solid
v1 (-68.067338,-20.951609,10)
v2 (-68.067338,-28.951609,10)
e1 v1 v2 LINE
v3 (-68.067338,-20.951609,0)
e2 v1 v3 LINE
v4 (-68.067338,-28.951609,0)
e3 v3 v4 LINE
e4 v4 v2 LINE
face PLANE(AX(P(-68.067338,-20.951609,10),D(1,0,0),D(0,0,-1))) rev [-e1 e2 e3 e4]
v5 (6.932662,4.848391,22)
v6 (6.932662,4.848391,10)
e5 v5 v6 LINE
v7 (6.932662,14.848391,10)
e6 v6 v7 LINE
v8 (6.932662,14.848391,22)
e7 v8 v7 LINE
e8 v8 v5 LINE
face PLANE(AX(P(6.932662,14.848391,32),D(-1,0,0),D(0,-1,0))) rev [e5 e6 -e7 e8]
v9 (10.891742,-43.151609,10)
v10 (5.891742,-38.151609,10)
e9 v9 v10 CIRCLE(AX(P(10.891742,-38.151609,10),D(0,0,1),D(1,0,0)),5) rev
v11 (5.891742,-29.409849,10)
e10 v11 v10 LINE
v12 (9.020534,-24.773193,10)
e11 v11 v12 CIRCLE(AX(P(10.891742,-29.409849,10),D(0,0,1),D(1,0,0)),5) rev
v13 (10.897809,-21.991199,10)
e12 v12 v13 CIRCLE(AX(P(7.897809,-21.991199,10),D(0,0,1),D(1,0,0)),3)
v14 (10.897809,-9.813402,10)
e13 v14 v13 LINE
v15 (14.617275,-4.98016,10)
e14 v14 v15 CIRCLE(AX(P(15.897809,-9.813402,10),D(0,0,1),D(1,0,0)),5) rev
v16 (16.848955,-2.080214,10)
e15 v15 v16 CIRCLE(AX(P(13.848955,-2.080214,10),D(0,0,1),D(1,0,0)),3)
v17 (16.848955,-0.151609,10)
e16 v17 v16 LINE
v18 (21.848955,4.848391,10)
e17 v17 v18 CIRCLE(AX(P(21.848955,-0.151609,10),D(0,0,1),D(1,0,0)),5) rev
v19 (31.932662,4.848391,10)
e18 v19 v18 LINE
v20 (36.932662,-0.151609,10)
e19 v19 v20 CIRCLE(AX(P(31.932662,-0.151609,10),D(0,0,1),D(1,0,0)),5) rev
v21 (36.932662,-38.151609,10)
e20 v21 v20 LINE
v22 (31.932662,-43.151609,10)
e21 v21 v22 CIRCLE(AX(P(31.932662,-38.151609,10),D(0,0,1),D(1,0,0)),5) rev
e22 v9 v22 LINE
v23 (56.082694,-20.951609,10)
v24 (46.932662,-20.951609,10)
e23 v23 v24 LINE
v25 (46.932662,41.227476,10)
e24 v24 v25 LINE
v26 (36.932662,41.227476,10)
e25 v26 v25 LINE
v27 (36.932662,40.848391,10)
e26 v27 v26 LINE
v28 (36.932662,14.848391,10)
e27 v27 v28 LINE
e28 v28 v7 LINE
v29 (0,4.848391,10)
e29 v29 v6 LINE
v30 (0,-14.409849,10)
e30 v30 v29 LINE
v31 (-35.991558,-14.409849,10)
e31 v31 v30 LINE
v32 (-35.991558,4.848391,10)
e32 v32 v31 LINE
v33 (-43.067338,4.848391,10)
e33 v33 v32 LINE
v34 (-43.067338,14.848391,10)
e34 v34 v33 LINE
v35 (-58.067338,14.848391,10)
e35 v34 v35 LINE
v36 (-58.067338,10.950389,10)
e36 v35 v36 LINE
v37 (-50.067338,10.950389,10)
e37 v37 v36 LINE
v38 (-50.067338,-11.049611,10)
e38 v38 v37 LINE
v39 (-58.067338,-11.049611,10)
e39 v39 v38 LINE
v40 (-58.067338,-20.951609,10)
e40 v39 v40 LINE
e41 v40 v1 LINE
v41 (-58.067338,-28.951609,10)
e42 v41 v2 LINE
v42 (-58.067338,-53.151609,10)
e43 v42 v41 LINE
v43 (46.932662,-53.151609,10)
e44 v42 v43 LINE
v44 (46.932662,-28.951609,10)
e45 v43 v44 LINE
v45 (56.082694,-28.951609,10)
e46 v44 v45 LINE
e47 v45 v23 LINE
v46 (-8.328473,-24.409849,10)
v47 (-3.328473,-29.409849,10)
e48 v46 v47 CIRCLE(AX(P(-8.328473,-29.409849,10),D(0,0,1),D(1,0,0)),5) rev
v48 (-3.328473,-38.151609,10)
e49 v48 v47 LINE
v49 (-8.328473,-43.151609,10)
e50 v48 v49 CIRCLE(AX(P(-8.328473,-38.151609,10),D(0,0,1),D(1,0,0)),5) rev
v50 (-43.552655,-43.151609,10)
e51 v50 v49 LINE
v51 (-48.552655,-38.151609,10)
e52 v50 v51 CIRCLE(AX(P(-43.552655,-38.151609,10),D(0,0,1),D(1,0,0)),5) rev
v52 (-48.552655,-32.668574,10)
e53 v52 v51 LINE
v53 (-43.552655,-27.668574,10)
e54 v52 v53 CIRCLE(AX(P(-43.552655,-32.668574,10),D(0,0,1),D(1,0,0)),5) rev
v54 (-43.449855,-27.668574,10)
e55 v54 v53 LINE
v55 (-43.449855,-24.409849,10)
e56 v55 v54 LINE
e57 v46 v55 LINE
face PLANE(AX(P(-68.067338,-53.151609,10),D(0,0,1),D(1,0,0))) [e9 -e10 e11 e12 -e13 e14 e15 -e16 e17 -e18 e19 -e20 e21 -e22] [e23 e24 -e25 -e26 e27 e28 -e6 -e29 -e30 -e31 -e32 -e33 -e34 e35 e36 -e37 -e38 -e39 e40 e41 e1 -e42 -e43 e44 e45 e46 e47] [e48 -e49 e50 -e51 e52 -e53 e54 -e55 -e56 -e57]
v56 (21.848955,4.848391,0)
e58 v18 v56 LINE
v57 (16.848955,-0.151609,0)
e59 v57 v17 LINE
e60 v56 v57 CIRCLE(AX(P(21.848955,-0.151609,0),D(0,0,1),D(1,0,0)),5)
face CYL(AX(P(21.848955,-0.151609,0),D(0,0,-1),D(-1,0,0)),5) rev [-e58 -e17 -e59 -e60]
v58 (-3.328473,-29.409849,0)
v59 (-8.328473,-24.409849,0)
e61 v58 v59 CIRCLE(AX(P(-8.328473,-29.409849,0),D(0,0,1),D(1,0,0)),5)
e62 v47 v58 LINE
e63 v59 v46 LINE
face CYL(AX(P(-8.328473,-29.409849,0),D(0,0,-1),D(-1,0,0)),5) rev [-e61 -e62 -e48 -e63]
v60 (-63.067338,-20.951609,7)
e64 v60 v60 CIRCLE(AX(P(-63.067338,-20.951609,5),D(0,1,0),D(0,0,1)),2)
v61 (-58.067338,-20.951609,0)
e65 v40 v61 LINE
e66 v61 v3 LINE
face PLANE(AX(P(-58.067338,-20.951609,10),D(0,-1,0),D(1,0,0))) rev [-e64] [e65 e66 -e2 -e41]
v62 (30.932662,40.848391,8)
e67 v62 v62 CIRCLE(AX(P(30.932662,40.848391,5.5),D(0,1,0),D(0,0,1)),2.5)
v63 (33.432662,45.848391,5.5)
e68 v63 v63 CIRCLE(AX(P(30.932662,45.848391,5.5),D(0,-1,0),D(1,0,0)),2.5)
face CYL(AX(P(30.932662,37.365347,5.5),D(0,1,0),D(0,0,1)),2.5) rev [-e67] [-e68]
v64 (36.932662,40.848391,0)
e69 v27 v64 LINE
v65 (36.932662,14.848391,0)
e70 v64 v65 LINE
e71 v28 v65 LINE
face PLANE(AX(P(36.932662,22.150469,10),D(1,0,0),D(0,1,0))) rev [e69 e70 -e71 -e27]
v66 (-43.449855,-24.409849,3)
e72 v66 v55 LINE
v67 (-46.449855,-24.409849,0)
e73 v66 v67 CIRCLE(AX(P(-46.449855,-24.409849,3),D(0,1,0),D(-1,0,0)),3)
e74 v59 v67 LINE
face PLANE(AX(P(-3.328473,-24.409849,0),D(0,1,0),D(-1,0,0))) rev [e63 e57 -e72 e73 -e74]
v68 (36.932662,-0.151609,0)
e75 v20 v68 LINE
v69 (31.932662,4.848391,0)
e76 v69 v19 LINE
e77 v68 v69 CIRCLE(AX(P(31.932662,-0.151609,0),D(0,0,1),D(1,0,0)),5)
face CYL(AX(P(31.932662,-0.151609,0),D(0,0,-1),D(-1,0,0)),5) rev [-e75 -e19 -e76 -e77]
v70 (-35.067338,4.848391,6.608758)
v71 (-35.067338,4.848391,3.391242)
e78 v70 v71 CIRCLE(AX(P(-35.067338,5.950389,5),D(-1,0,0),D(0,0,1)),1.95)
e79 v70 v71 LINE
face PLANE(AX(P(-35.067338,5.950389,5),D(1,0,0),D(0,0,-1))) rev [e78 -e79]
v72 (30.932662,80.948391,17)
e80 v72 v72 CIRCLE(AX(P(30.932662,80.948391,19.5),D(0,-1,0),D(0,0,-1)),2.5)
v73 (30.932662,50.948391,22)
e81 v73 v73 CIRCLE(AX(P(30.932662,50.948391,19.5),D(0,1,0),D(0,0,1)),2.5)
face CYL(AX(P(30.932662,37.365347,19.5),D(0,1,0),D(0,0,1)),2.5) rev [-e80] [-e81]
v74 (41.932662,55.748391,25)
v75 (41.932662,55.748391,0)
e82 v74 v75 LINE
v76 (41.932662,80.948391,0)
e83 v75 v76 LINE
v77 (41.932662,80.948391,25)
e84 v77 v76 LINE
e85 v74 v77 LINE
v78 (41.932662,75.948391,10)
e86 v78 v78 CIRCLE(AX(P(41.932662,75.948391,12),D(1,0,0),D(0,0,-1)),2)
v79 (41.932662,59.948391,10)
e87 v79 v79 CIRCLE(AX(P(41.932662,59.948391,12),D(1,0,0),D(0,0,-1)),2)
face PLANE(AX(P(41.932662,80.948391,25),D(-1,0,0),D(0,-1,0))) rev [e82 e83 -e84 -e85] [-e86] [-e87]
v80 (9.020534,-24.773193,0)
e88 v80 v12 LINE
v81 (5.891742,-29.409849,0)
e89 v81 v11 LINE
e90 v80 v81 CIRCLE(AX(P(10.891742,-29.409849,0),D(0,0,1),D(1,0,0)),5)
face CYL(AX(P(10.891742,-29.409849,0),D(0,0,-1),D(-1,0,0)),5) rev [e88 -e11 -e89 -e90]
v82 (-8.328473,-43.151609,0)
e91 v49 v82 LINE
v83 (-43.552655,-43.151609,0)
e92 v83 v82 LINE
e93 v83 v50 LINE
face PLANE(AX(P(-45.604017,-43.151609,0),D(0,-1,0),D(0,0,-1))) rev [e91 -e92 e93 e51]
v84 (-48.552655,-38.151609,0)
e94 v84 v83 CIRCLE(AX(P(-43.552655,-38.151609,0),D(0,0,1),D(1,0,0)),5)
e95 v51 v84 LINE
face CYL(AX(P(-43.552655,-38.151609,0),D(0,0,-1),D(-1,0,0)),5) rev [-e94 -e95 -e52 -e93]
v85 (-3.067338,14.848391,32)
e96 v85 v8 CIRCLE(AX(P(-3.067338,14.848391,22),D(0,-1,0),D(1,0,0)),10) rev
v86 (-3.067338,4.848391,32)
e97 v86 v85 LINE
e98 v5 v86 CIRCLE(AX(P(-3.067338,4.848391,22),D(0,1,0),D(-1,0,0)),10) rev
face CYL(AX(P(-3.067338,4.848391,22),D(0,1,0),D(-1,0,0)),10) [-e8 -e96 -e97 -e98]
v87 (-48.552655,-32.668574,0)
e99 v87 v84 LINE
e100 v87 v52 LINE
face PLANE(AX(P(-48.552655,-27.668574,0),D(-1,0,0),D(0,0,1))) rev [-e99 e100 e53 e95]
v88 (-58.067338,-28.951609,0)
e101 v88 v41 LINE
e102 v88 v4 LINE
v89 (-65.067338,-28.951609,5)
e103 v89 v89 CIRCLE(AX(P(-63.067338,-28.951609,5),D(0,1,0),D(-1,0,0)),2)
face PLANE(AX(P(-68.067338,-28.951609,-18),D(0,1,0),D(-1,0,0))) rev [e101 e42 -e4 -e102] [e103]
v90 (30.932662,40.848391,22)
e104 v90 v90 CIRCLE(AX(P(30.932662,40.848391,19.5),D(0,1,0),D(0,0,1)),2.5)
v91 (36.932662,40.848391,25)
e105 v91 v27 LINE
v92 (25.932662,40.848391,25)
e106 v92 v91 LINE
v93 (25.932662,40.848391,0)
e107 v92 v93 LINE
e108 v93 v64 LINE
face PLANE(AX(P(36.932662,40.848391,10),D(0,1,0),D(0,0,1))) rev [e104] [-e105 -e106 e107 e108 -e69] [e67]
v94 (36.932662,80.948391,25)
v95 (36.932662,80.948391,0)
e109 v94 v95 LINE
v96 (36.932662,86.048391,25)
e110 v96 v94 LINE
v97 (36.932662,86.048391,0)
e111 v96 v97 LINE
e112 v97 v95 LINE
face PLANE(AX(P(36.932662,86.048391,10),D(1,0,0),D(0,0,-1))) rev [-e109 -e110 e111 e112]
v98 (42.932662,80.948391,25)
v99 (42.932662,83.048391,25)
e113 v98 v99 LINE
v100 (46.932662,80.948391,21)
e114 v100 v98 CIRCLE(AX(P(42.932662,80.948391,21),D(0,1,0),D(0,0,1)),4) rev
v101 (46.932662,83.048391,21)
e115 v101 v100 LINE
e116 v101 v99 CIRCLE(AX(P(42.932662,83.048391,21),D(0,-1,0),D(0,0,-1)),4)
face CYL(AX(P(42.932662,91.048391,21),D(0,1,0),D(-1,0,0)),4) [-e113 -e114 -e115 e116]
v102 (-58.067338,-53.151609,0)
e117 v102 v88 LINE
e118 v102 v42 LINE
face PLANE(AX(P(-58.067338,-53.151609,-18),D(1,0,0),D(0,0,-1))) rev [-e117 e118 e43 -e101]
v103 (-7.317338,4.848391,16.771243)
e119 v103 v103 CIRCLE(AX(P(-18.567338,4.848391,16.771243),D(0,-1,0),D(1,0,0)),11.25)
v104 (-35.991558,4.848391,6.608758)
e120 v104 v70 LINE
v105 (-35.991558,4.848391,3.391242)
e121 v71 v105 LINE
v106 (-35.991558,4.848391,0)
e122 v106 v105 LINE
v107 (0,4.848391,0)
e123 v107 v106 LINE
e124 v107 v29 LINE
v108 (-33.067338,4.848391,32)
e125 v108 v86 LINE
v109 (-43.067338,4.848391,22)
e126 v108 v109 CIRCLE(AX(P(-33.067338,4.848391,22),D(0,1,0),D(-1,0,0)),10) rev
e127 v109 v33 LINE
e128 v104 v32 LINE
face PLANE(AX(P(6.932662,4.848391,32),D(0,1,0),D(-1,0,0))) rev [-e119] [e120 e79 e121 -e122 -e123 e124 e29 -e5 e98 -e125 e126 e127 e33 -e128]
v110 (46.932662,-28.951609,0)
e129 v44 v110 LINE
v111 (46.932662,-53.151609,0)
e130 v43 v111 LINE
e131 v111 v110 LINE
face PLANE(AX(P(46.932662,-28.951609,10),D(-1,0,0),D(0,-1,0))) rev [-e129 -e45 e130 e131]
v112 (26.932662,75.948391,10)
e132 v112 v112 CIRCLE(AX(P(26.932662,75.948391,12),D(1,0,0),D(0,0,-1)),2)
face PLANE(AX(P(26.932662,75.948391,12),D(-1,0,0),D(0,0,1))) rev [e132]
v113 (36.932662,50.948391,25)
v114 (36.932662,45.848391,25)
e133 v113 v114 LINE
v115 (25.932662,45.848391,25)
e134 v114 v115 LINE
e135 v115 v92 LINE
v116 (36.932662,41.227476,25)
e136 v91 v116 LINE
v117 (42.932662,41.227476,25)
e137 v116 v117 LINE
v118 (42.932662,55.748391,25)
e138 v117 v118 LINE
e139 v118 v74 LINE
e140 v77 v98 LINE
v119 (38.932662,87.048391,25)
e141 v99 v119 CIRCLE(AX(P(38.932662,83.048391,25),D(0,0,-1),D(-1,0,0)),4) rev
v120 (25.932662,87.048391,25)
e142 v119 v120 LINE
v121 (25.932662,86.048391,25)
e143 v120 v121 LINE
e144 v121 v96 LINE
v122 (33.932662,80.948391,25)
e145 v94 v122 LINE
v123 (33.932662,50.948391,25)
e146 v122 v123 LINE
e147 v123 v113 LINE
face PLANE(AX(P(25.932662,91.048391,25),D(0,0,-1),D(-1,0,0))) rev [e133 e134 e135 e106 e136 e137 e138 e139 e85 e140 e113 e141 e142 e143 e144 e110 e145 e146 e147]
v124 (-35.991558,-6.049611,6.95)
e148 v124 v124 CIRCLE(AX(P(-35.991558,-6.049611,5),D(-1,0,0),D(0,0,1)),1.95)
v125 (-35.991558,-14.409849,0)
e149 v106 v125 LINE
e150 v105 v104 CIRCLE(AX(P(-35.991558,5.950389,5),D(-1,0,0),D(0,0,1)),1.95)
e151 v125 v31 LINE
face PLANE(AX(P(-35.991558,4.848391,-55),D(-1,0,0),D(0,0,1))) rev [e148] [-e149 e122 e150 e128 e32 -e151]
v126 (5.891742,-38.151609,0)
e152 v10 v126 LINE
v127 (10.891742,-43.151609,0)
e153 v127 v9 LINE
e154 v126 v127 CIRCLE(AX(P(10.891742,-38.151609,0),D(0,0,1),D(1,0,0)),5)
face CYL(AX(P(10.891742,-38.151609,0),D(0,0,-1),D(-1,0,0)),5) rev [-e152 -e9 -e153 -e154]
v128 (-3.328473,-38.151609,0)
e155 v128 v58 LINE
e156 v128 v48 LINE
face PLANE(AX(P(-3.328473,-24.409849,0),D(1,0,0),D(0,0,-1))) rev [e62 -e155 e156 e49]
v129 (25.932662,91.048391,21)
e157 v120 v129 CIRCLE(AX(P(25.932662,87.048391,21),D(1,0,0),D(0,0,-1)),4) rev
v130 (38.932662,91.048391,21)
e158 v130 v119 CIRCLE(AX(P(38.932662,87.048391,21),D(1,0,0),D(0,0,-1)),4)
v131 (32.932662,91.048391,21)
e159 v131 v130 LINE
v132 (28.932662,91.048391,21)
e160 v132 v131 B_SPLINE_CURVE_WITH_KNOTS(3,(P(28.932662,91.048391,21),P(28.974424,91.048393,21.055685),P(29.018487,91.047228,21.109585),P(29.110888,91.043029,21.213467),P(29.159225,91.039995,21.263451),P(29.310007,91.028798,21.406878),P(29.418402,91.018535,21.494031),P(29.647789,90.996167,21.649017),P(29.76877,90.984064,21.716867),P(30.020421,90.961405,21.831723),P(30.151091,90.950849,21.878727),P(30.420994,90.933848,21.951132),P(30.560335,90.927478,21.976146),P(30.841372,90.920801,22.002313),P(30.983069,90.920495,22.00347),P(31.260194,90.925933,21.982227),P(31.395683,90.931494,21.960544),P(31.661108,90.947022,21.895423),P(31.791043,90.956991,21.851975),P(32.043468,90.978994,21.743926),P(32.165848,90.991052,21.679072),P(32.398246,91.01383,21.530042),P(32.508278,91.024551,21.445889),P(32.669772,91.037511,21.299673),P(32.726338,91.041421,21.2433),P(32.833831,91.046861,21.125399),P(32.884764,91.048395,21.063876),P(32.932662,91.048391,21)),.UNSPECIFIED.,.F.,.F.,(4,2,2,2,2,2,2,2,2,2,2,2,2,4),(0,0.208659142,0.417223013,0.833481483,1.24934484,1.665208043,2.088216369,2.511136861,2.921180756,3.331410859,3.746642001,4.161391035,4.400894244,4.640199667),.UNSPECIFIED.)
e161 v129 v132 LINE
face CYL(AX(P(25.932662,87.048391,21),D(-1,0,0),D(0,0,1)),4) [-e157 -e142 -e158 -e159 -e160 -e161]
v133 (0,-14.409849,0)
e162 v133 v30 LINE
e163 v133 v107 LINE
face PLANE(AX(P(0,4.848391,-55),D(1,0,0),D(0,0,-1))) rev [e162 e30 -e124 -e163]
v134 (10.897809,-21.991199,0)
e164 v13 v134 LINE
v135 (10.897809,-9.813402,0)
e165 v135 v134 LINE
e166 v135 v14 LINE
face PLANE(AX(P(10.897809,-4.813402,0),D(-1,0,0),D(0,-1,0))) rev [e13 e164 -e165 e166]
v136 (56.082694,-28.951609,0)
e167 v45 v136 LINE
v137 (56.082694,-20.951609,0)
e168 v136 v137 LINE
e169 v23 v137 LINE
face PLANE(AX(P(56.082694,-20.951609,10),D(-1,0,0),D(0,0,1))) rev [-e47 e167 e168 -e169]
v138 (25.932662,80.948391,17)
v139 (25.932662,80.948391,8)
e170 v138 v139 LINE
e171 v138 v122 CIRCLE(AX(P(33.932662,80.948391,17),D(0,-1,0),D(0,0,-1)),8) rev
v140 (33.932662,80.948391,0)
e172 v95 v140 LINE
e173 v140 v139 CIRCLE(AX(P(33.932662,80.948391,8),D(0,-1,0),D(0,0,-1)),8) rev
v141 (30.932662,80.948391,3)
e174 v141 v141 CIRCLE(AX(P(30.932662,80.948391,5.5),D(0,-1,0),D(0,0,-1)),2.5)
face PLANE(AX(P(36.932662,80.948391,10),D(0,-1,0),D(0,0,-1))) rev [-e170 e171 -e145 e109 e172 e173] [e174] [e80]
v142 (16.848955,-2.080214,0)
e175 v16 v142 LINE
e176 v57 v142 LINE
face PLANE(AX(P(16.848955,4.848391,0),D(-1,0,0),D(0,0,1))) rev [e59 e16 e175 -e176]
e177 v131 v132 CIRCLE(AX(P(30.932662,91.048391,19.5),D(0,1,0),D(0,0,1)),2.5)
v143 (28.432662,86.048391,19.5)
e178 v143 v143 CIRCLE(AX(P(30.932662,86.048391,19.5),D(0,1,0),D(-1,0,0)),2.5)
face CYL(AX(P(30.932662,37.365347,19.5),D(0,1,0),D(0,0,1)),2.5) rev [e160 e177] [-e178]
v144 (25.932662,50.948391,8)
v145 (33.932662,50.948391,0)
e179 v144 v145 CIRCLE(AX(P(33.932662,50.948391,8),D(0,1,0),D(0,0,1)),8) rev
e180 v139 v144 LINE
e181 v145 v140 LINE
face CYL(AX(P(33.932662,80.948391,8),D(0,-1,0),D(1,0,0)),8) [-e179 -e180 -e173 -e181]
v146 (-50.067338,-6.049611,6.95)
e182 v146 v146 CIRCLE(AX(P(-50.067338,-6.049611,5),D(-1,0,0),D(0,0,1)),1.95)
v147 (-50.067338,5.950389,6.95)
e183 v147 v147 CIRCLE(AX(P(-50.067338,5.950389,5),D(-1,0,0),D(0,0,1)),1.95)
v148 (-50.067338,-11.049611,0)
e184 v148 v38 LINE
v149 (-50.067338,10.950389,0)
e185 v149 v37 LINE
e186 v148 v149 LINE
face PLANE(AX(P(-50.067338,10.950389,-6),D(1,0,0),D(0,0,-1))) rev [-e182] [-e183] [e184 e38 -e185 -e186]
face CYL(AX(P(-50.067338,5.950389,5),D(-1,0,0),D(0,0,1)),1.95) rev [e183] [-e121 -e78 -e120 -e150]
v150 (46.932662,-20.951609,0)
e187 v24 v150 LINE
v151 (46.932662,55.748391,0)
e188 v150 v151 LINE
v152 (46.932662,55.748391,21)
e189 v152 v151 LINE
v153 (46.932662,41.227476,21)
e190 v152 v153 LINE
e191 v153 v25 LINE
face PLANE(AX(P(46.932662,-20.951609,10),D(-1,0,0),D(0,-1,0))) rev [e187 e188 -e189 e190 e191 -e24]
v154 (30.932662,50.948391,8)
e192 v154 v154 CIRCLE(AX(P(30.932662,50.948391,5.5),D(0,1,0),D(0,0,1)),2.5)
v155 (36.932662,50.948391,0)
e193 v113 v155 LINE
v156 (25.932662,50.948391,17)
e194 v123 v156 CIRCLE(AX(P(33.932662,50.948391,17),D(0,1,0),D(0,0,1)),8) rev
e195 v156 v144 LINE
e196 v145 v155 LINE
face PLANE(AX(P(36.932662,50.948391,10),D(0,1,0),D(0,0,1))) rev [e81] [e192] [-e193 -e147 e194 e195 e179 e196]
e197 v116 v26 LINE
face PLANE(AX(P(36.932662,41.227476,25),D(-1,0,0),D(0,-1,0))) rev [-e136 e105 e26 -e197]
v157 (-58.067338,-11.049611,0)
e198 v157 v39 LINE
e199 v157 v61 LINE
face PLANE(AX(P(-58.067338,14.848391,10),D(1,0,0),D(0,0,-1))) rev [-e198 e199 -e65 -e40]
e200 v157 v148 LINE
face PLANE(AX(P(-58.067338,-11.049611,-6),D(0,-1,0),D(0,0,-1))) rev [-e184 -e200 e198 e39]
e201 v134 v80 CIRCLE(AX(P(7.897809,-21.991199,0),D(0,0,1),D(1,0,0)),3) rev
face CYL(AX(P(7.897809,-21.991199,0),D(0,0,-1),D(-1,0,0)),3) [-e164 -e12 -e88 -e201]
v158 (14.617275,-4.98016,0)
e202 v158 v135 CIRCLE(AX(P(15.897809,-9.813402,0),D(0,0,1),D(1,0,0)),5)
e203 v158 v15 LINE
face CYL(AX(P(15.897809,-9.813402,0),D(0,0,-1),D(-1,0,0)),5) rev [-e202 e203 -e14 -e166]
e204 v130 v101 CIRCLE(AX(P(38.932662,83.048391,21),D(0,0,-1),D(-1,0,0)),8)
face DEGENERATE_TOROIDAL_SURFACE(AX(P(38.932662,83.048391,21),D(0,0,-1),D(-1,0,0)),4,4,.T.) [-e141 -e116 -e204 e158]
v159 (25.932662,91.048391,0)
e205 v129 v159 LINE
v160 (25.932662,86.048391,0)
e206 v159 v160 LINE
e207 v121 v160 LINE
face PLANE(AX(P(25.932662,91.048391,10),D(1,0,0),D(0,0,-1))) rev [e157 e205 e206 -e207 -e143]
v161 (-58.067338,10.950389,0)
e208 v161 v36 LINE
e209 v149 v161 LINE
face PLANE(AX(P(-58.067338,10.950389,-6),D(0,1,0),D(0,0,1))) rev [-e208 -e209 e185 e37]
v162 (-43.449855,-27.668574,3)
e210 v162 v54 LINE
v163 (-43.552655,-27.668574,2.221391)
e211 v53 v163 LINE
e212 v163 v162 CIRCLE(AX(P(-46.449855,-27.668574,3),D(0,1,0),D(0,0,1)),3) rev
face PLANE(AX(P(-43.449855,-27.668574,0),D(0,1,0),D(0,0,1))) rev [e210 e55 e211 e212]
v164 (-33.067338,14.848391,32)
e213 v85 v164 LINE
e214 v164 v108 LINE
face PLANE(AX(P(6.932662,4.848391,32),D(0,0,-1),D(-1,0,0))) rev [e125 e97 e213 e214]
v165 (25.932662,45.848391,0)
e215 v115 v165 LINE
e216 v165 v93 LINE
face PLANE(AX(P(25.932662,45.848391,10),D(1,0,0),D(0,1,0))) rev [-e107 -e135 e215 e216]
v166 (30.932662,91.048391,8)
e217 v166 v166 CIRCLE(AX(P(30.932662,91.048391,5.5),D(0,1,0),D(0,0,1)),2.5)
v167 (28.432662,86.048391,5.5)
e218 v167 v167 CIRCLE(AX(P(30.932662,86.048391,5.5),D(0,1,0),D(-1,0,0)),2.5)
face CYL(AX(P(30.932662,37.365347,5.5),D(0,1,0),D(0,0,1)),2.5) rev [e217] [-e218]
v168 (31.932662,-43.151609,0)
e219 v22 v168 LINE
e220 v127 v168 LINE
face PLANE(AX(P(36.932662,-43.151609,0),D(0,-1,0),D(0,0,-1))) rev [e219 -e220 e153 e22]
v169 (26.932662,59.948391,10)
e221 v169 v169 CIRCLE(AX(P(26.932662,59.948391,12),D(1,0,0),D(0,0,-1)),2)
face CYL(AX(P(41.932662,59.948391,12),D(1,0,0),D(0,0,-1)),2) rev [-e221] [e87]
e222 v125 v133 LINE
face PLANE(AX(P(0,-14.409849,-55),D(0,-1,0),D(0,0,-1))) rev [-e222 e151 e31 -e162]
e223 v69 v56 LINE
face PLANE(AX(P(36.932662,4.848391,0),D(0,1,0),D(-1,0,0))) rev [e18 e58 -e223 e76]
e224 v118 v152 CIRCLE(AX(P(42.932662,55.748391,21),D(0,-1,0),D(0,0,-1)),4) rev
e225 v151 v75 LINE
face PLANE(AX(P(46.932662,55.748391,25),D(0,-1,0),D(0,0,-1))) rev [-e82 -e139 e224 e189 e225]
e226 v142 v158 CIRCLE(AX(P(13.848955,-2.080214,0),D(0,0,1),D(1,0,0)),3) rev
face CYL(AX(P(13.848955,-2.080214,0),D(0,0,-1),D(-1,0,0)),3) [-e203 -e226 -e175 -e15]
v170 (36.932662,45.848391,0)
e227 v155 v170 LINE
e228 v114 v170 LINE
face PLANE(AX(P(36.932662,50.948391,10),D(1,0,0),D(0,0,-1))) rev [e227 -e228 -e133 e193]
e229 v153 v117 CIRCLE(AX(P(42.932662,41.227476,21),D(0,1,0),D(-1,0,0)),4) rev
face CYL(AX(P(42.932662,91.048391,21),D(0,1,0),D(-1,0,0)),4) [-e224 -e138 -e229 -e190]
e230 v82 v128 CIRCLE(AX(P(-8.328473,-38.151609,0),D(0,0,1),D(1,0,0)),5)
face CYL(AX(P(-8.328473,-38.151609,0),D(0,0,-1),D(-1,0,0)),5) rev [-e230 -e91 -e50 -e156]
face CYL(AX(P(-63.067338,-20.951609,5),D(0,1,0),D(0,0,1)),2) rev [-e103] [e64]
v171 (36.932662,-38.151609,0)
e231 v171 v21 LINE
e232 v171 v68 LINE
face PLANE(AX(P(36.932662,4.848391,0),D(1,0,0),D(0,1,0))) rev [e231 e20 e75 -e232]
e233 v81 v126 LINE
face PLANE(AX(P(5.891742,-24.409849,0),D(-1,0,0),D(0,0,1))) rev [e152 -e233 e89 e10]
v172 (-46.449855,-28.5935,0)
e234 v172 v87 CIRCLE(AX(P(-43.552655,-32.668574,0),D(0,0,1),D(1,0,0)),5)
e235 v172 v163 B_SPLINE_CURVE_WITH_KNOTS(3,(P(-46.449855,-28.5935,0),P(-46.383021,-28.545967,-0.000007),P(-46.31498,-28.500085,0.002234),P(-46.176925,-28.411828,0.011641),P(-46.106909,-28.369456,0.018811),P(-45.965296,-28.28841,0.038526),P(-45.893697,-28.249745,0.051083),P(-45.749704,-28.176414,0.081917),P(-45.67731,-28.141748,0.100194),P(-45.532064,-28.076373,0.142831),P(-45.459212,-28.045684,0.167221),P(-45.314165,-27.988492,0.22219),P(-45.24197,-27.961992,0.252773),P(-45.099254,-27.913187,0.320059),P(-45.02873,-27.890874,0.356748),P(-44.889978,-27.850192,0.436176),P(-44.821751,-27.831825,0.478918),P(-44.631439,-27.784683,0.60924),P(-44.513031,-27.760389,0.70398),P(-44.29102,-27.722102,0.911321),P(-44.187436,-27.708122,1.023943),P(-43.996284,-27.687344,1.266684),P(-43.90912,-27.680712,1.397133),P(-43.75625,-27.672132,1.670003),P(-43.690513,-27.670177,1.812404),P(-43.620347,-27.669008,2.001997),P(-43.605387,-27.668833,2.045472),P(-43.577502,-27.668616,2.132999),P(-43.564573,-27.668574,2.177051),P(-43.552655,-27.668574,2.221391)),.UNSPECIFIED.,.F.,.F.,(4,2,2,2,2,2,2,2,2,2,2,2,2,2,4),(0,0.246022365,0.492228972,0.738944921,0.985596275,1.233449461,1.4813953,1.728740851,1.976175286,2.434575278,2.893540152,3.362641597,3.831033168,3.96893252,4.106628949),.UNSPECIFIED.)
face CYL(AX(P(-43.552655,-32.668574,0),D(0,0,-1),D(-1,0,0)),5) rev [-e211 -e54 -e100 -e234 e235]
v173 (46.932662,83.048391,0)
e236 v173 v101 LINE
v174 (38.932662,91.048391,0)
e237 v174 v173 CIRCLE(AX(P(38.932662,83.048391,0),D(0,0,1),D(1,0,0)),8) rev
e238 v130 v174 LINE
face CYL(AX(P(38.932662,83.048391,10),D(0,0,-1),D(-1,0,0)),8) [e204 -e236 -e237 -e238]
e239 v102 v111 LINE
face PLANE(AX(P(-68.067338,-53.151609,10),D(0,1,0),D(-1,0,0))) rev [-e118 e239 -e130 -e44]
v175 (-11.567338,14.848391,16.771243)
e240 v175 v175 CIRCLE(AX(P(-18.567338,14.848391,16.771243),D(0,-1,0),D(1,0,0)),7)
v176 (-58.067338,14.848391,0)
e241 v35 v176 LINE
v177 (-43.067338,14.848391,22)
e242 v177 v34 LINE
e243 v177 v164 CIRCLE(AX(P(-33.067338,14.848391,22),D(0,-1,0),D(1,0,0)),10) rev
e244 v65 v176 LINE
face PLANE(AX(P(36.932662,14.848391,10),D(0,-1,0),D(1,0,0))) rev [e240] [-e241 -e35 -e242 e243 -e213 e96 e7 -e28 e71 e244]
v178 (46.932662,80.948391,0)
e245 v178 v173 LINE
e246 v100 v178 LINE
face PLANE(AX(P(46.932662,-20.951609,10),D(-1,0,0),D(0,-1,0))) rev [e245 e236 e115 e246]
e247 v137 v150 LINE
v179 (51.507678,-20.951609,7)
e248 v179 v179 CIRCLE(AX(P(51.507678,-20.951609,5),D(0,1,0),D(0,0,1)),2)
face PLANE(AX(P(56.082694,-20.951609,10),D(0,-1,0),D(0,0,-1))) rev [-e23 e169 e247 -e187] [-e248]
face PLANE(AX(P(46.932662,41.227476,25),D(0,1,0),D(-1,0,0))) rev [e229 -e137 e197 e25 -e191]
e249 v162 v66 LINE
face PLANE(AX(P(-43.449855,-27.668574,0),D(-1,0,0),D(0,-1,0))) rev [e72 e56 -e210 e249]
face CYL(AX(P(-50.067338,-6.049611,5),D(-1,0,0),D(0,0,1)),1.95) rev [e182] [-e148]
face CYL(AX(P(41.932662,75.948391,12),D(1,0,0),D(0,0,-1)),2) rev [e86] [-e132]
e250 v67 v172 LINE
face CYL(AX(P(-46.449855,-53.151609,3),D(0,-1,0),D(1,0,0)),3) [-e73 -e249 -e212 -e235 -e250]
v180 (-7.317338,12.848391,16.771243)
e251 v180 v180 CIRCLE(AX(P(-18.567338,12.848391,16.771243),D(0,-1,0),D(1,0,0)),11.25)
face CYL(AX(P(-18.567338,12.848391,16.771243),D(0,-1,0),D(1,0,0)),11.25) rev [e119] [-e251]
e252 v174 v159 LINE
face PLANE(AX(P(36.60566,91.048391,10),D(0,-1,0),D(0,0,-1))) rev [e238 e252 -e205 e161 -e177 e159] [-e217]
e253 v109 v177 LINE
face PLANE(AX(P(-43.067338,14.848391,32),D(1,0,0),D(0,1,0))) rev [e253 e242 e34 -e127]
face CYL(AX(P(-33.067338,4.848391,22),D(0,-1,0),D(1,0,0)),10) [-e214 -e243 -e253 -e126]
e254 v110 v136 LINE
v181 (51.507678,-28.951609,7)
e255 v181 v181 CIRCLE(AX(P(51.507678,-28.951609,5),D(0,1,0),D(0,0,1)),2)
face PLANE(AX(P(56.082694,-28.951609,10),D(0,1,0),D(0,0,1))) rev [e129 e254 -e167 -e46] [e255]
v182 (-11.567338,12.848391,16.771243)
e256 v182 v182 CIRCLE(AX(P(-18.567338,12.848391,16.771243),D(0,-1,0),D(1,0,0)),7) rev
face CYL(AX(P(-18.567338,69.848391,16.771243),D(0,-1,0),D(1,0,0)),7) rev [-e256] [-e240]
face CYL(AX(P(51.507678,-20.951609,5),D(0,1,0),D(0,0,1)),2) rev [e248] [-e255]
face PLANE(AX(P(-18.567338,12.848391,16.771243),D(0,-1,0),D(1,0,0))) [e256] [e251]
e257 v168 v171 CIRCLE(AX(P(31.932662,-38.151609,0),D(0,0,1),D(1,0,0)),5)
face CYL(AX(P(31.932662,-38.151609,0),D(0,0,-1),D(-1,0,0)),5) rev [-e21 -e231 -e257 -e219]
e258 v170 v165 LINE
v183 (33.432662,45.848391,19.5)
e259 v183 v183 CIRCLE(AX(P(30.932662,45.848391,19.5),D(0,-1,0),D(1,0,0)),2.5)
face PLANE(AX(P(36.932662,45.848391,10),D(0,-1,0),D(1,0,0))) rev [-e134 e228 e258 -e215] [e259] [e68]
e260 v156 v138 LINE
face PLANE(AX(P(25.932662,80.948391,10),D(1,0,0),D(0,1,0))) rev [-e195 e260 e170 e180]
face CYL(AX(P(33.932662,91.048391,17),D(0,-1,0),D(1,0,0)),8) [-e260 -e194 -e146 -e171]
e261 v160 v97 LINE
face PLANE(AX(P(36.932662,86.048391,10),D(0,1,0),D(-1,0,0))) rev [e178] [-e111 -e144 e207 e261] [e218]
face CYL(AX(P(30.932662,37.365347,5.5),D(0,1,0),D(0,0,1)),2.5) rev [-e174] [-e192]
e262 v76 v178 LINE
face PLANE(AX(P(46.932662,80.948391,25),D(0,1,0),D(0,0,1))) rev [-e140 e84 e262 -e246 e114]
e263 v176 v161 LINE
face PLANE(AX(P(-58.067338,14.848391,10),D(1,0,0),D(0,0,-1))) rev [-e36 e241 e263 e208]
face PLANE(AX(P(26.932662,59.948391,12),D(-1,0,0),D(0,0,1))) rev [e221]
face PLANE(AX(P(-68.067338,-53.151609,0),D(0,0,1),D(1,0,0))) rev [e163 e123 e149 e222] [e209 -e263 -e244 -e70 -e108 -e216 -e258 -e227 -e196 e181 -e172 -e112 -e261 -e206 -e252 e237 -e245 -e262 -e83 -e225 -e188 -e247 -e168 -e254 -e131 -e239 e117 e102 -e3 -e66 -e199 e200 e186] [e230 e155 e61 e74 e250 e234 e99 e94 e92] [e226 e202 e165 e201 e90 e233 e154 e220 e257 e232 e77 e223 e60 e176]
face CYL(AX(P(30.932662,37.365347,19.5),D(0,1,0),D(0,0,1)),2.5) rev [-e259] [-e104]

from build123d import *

# Parameters (mm, degrees)
EXTRUDE1_DEPTH               = 10
EXTRUDE2_DEPTH               = 15
FILLET1_R                    = 8
SKETCH3_R                    = 2.5
CUT_EXTRUDE1_DEPTH           = 53.683044042
FILLET4_R                    = 8
FILLET7_R                    = 4
SKETCH4_W                    = 5
SKETCH4_H                    = 25.2
EXTRUDE3_DEPTH               = 117.395755978
F_4_0_4_DIAMETER_HOLE1_D     = 4
F_4_0_4_DIAMETER_HOLE1_DEPTH = 15
SKETCH6_W                    = 50
SKETCH6_H                    = 10
EXTRUDE4_DEPTH               = 22
SKETCH7_W                    = 35.991558426
SKETCH7_H                    = 19.258240123
EXTRUDE5_DEPTH               = 65
SKETCH8_R                    = 7
EXTRUDE6_DEPTH               = 65
SKETCH9_R                    = 11.25
EXTRUDE7_DEPTH               = 8
FILLET8_R                    = 10
SKETCH11_W                   = 10
SKETCH11_H                   = 24.2
EXTRUDE9_DEPTH               = 28
F_4_0_4_DIAMETER_HOLE2_D     = 4
F_4_0_4_DIAMETER_HOLE2_DEPTH = 15
SKETCH13_W                   = 8
SKETCH13_H                   = 22
CUT_EXTRUDE2_DEPTH           = 16
F_4_0_4_DIAMETER_HOLE3_D     = 3.9
F_4_0_4_DIAMETER_HOLE3_DEPTH = 15
EXTRUDE10_DEPTH              = 10
FILLET9_R                    = 5
FILLET10_R                   = 3


with BuildPart() as part:
    # Sketch1 → Extrude1 (new body)
    with BuildSketch(Plane.XY):
        Polygon((-68.067337579, -53.151608792), (46.932662421, -53.151608792), (46.932662421, -28.951608792), (56.08269406, -28.951608792), (56.08269406, -20.951608792), (46.932662421, -20.951608792), (46.932662421, 91.048391208), (36.605660332, 91.048391208), (25.932662421, 91.048391208), (25.932662421, 86.048391208), (36.932662421, 86.048391208), (36.932662421, 80.948391208), (25.932662421, 80.948391208), (25.932662421, 50.948391208), (36.932662421, 50.948391208), (36.932662421, 45.848391208), (25.932662421, 45.848391208), (25.932662421, 40.848391208), (36.932662421, 40.848391208), (36.932662421, 25.69350339), (36.932662421, 22.150468938), (36.932662421, 14.848391208), (-58.067337579, 14.848391208), (-58.067337579, -20.951608792), (-68.067337579, -20.951608792), align=None)
    extrude(amount=EXTRUDE1_DEPTH)

    # Sketch2 → Extrude2 (add)
    with BuildSketch(Plane.XY.offset(10)):
        Polygon((25.932662421, 91.048391208), (46.932662421, 91.048391208), (46.932662421, 41.227475545), (36.932662421, 41.227475545), (36.932662421, 40.848391208), (25.932662421, 40.848391208), (25.932662421, 45.848391208), (36.932662421, 45.848391208), (36.932662421, 50.948391208), (25.932662421, 50.948391208), (25.932662421, 80.948391208), (36.932662421, 80.948391208), (36.932662421, 86.048391208), (25.932662421, 86.048391208), align=None)
    extrude(amount=EXTRUDE2_DEPTH)

    # Fillet1
    fillet1_edges = [part.edges().sort_by_distance(p)[0] for p in [
        (25.932662421, 65.948391208, 0),
        (25.932662421, 65.948391208, 25),
    ]]
    fillet(fillet1_edges, radius=FILLET1_R)

    # Sketch3 → Cut-Extrude1 (cut)
    with BuildSketch(Plane(origin=(0, 91.048391208, 0), x_dir=(-1, 0, 0), z_dir=(0, 1, 0))):
        with Locations(Location((-30.932662421, 5.5, 0), (0, 0, 90))):
            Circle(SKETCH3_R)
        with Locations(Location((-30.932662421, 19.5, 0), (0, 0, 90))):
            Circle(SKETCH3_R)
    extrude(amount=-CUT_EXTRUDE1_DEPTH, mode=Mode.SUBTRACT)

    # Fillet4
    fillet4_edges = [part.edges().sort_by_distance(p)[0] for p in [
        (46.932662421, 91.048391208, 12.5),
    ]]
    fillet(fillet4_edges, radius=FILLET4_R)

    # Fillet7
    # the kernel refuses this fillet: 4 mm, written as the material it takes off along each edge
    with BuildSketch(Plane(origin=(46.932662421, 83.048391208, 25), x_dir=(-1, 0, 0), z_dir=(0, -1, 0))) as fillet7_piece_1:
        with BuildLine():
            CenterArc((FILLET7_R, FILLET7_R), FILLET7_R, 180, 90)
            Line((0, FILLET7_R), (0, 0))
            Line((0, 0), (FILLET7_R, 0))
        make_face()
    extrude(amount=51.820915662, mode=Mode.SUBTRACT)
    with BuildSketch(Plane(origin=(15.932662421, 91.048391208, 25), x_dir=(0, -1, 0), z_dir=(1, 0, 0))) as fillet7_piece_2:
        with BuildLine():
            CenterArc((FILLET7_R, FILLET7_R), FILLET7_R, 180, 90)
            Line((0, FILLET7_R), (0, 0))
            Line((0, 0), (FILLET7_R, 0))
        make_face()
    extrude(amount=23, mode=Mode.SUBTRACT)
    with BuildSketch(Plane(origin=(38.932662421, 83.048391208, 25), x_dir=(0, 1, 0), z_dir=(-1, 0, 0))) as fillet7_piece_3:
        with BuildLine():
            CenterArc((8 - FILLET7_R, FILLET7_R), FILLET7_R, 270, 90)
            Line((8, FILLET7_R), (8, 0))
            Line((8, 0), (8 - FILLET7_R, 0))
        make_face()
    revolve(axis=Axis((38.932662421, 83.048391208, 25), (0, 0, -1)), revolution_arc=90, mode=Mode.SUBTRACT)

    # Sketch4 → Extrude3 (cut, through all)
    with BuildSketch(Plane(origin=(0, 0, 0), x_dir=(-1, 0, 0), z_dir=(0, 0, -1))):
        with Locations((-44.432662421, 68.348391208)):
            Rectangle(SKETCH4_W, SKETCH4_H)
    extrude(amount=-EXTRUDE3_DEPTH, mode=Mode.SUBTRACT)

    # Ø4.0 (4) Diameter Hole1
    with Locations(Plane(origin=(41.932662421, 75.948391208, 12), x_dir=(0, 1, 0), z_dir=(1, 0, 0))):
        with Locations((0, 0), (-16, 0)):
            Hole(F_4_0_4_DIAMETER_HOLE1_D / 2, depth=F_4_0_4_DIAMETER_HOLE1_DEPTH)

    # Sketch6 → Extrude4 (add)
    with BuildSketch(Plane.XY.offset(10)):
        with Locations((-18.067337579, 9.848391208)):
            Rectangle(SKETCH6_W, SKETCH6_H)
    extrude(amount=EXTRUDE4_DEPTH)

    # Sketch7 → Extrude5 (cut)
    with BuildSketch(Plane.XY.offset(10)):
        with Locations((-17.995779213, -4.780728854)):
            Rectangle(SKETCH7_W, SKETCH7_H)
    extrude(amount=-EXTRUDE5_DEPTH, mode=Mode.SUBTRACT)

    # Sketch8 → Extrude6 (cut)
    with BuildSketch(Plane.XZ.offset(-4.848391208)):
        with Locations((-18.567337579, 16.771243445)):
            Circle(SKETCH8_R)
    extrude(amount=-EXTRUDE6_DEPTH, mode=Mode.SUBTRACT)

    # Sketch9 → Extrude7 (cut)
    with BuildSketch(Plane.XZ.offset(-4.848391208)):
        with Locations((-18.567337579, 16.771243445)):
            Circle(SKETCH9_R)
    extrude(amount=-EXTRUDE7_DEPTH, mode=Mode.SUBTRACT)

    # Fillet8
    fillet8_edges = [part.edges().sort_by_distance(p)[0] for p in [
        (6.932662421, 9.848391208, 32),
        (-43.067337579, 9.848391208, 32),
    ]]
    fillet(fillet8_edges, radius=FILLET8_R)

    # Sketch11 → Extrude9 (cut)
    with BuildSketch(Plane.XY.offset(10)):
        with Locations((-63.067337579, -41.051608792)):
            Rectangle(SKETCH11_W, SKETCH11_H)
    extrude(amount=-EXTRUDE9_DEPTH, mode=Mode.SUBTRACT)

    # Ø4.0 (4) Diameter Hole2
    with Locations(Plane(origin=(-63.067337579, -20.951608792, 5), x_dir=(1, 0, 0), z_dir=(0, 1, 0))):
        with Locations((0, 0), (114.57501582, 0)):
            Hole(F_4_0_4_DIAMETER_HOLE2_D / 2, depth=F_4_0_4_DIAMETER_HOLE2_DEPTH)

    # Sketch13 → Cut-Extrude2 (cut)
    with BuildSketch(Plane.XY.offset(10)):
        with Locations((-54.067337579, -0.049611207)):
            Rectangle(SKETCH13_W, SKETCH13_H)
    extrude(amount=-CUT_EXTRUDE2_DEPTH, mode=Mode.SUBTRACT)

    # Ø4.0 (4) Diameter Hole3
    with Locations(Plane(origin=(-50.067337579, 5.950388793, 5), x_dir=(0, 0, -1), z_dir=(-1, 0, 0))):
        with Locations((0, 0), (0, 12)):
            Hole(F_4_0_4_DIAMETER_HOLE3_D / 2, depth=F_4_0_4_DIAMETER_HOLE3_DEPTH)

    # Sketch10 → Extrude10 (cut)
    with BuildSketch(Plane.XY.offset(10)):
        Polygon((36.932662421, 4.848391208), (16.848954564, 4.848391208), (16.848954564, -4.813402299), (10.897809309, -4.813402299), (10.897809309, -24.409848915), (5.891741908, -24.409848915), (5.891741908, -43.151608792), (10.897809309, -43.151608792), (16.848954564, -43.151608792), (36.932662421, -43.151608792), align=None)
        Polygon((-43.449854697, -27.668574095), (-48.552654799, -27.668574095), (-48.552654799, -43.151608792), (-45.604016638, -43.151608792), (-3.328472946, -43.151608792), (-3.328472946, -24.409848915), (-43.449854697, -24.409848915), align=None)
    extrude(amount=-EXTRUDE10_DEPTH, mode=Mode.SUBTRACT)

    # Fillet9
    fillet9_edges = [part.edges().sort_by_distance(p)[0] for p in [
        (36.932662421, 4.848391208, 5),
        (36.932662421, -43.151608792, 5),
        (5.891741908, -43.151608792, 5),
        (5.891741908, -24.409848915, 5),
        (10.897809309, -4.813402299, 5),
        (16.848954564, 4.848391208, 5),
        (-3.328472946, -43.151608792, 5),
        (-48.552654799, -43.151608792, 5),
        (-48.552654799, -27.668574095, 5),
        (-3.328472946, -24.409848915, 5),
    ]]
    fillet(fillet9_edges, radius=FILLET9_R)

    # Fillet10
    fillet10_edges = [part.edges().sort_by_distance(p)[0] for p in [
        (-43.449854697, -26.039211505, 0),
        (16.848954564, -4.813402299, 5),
        (10.897809309, -24.409848915, 5),
    ]]
    fillet(fillet10_edges, radius=FILLET10_R)


solid = part.part
